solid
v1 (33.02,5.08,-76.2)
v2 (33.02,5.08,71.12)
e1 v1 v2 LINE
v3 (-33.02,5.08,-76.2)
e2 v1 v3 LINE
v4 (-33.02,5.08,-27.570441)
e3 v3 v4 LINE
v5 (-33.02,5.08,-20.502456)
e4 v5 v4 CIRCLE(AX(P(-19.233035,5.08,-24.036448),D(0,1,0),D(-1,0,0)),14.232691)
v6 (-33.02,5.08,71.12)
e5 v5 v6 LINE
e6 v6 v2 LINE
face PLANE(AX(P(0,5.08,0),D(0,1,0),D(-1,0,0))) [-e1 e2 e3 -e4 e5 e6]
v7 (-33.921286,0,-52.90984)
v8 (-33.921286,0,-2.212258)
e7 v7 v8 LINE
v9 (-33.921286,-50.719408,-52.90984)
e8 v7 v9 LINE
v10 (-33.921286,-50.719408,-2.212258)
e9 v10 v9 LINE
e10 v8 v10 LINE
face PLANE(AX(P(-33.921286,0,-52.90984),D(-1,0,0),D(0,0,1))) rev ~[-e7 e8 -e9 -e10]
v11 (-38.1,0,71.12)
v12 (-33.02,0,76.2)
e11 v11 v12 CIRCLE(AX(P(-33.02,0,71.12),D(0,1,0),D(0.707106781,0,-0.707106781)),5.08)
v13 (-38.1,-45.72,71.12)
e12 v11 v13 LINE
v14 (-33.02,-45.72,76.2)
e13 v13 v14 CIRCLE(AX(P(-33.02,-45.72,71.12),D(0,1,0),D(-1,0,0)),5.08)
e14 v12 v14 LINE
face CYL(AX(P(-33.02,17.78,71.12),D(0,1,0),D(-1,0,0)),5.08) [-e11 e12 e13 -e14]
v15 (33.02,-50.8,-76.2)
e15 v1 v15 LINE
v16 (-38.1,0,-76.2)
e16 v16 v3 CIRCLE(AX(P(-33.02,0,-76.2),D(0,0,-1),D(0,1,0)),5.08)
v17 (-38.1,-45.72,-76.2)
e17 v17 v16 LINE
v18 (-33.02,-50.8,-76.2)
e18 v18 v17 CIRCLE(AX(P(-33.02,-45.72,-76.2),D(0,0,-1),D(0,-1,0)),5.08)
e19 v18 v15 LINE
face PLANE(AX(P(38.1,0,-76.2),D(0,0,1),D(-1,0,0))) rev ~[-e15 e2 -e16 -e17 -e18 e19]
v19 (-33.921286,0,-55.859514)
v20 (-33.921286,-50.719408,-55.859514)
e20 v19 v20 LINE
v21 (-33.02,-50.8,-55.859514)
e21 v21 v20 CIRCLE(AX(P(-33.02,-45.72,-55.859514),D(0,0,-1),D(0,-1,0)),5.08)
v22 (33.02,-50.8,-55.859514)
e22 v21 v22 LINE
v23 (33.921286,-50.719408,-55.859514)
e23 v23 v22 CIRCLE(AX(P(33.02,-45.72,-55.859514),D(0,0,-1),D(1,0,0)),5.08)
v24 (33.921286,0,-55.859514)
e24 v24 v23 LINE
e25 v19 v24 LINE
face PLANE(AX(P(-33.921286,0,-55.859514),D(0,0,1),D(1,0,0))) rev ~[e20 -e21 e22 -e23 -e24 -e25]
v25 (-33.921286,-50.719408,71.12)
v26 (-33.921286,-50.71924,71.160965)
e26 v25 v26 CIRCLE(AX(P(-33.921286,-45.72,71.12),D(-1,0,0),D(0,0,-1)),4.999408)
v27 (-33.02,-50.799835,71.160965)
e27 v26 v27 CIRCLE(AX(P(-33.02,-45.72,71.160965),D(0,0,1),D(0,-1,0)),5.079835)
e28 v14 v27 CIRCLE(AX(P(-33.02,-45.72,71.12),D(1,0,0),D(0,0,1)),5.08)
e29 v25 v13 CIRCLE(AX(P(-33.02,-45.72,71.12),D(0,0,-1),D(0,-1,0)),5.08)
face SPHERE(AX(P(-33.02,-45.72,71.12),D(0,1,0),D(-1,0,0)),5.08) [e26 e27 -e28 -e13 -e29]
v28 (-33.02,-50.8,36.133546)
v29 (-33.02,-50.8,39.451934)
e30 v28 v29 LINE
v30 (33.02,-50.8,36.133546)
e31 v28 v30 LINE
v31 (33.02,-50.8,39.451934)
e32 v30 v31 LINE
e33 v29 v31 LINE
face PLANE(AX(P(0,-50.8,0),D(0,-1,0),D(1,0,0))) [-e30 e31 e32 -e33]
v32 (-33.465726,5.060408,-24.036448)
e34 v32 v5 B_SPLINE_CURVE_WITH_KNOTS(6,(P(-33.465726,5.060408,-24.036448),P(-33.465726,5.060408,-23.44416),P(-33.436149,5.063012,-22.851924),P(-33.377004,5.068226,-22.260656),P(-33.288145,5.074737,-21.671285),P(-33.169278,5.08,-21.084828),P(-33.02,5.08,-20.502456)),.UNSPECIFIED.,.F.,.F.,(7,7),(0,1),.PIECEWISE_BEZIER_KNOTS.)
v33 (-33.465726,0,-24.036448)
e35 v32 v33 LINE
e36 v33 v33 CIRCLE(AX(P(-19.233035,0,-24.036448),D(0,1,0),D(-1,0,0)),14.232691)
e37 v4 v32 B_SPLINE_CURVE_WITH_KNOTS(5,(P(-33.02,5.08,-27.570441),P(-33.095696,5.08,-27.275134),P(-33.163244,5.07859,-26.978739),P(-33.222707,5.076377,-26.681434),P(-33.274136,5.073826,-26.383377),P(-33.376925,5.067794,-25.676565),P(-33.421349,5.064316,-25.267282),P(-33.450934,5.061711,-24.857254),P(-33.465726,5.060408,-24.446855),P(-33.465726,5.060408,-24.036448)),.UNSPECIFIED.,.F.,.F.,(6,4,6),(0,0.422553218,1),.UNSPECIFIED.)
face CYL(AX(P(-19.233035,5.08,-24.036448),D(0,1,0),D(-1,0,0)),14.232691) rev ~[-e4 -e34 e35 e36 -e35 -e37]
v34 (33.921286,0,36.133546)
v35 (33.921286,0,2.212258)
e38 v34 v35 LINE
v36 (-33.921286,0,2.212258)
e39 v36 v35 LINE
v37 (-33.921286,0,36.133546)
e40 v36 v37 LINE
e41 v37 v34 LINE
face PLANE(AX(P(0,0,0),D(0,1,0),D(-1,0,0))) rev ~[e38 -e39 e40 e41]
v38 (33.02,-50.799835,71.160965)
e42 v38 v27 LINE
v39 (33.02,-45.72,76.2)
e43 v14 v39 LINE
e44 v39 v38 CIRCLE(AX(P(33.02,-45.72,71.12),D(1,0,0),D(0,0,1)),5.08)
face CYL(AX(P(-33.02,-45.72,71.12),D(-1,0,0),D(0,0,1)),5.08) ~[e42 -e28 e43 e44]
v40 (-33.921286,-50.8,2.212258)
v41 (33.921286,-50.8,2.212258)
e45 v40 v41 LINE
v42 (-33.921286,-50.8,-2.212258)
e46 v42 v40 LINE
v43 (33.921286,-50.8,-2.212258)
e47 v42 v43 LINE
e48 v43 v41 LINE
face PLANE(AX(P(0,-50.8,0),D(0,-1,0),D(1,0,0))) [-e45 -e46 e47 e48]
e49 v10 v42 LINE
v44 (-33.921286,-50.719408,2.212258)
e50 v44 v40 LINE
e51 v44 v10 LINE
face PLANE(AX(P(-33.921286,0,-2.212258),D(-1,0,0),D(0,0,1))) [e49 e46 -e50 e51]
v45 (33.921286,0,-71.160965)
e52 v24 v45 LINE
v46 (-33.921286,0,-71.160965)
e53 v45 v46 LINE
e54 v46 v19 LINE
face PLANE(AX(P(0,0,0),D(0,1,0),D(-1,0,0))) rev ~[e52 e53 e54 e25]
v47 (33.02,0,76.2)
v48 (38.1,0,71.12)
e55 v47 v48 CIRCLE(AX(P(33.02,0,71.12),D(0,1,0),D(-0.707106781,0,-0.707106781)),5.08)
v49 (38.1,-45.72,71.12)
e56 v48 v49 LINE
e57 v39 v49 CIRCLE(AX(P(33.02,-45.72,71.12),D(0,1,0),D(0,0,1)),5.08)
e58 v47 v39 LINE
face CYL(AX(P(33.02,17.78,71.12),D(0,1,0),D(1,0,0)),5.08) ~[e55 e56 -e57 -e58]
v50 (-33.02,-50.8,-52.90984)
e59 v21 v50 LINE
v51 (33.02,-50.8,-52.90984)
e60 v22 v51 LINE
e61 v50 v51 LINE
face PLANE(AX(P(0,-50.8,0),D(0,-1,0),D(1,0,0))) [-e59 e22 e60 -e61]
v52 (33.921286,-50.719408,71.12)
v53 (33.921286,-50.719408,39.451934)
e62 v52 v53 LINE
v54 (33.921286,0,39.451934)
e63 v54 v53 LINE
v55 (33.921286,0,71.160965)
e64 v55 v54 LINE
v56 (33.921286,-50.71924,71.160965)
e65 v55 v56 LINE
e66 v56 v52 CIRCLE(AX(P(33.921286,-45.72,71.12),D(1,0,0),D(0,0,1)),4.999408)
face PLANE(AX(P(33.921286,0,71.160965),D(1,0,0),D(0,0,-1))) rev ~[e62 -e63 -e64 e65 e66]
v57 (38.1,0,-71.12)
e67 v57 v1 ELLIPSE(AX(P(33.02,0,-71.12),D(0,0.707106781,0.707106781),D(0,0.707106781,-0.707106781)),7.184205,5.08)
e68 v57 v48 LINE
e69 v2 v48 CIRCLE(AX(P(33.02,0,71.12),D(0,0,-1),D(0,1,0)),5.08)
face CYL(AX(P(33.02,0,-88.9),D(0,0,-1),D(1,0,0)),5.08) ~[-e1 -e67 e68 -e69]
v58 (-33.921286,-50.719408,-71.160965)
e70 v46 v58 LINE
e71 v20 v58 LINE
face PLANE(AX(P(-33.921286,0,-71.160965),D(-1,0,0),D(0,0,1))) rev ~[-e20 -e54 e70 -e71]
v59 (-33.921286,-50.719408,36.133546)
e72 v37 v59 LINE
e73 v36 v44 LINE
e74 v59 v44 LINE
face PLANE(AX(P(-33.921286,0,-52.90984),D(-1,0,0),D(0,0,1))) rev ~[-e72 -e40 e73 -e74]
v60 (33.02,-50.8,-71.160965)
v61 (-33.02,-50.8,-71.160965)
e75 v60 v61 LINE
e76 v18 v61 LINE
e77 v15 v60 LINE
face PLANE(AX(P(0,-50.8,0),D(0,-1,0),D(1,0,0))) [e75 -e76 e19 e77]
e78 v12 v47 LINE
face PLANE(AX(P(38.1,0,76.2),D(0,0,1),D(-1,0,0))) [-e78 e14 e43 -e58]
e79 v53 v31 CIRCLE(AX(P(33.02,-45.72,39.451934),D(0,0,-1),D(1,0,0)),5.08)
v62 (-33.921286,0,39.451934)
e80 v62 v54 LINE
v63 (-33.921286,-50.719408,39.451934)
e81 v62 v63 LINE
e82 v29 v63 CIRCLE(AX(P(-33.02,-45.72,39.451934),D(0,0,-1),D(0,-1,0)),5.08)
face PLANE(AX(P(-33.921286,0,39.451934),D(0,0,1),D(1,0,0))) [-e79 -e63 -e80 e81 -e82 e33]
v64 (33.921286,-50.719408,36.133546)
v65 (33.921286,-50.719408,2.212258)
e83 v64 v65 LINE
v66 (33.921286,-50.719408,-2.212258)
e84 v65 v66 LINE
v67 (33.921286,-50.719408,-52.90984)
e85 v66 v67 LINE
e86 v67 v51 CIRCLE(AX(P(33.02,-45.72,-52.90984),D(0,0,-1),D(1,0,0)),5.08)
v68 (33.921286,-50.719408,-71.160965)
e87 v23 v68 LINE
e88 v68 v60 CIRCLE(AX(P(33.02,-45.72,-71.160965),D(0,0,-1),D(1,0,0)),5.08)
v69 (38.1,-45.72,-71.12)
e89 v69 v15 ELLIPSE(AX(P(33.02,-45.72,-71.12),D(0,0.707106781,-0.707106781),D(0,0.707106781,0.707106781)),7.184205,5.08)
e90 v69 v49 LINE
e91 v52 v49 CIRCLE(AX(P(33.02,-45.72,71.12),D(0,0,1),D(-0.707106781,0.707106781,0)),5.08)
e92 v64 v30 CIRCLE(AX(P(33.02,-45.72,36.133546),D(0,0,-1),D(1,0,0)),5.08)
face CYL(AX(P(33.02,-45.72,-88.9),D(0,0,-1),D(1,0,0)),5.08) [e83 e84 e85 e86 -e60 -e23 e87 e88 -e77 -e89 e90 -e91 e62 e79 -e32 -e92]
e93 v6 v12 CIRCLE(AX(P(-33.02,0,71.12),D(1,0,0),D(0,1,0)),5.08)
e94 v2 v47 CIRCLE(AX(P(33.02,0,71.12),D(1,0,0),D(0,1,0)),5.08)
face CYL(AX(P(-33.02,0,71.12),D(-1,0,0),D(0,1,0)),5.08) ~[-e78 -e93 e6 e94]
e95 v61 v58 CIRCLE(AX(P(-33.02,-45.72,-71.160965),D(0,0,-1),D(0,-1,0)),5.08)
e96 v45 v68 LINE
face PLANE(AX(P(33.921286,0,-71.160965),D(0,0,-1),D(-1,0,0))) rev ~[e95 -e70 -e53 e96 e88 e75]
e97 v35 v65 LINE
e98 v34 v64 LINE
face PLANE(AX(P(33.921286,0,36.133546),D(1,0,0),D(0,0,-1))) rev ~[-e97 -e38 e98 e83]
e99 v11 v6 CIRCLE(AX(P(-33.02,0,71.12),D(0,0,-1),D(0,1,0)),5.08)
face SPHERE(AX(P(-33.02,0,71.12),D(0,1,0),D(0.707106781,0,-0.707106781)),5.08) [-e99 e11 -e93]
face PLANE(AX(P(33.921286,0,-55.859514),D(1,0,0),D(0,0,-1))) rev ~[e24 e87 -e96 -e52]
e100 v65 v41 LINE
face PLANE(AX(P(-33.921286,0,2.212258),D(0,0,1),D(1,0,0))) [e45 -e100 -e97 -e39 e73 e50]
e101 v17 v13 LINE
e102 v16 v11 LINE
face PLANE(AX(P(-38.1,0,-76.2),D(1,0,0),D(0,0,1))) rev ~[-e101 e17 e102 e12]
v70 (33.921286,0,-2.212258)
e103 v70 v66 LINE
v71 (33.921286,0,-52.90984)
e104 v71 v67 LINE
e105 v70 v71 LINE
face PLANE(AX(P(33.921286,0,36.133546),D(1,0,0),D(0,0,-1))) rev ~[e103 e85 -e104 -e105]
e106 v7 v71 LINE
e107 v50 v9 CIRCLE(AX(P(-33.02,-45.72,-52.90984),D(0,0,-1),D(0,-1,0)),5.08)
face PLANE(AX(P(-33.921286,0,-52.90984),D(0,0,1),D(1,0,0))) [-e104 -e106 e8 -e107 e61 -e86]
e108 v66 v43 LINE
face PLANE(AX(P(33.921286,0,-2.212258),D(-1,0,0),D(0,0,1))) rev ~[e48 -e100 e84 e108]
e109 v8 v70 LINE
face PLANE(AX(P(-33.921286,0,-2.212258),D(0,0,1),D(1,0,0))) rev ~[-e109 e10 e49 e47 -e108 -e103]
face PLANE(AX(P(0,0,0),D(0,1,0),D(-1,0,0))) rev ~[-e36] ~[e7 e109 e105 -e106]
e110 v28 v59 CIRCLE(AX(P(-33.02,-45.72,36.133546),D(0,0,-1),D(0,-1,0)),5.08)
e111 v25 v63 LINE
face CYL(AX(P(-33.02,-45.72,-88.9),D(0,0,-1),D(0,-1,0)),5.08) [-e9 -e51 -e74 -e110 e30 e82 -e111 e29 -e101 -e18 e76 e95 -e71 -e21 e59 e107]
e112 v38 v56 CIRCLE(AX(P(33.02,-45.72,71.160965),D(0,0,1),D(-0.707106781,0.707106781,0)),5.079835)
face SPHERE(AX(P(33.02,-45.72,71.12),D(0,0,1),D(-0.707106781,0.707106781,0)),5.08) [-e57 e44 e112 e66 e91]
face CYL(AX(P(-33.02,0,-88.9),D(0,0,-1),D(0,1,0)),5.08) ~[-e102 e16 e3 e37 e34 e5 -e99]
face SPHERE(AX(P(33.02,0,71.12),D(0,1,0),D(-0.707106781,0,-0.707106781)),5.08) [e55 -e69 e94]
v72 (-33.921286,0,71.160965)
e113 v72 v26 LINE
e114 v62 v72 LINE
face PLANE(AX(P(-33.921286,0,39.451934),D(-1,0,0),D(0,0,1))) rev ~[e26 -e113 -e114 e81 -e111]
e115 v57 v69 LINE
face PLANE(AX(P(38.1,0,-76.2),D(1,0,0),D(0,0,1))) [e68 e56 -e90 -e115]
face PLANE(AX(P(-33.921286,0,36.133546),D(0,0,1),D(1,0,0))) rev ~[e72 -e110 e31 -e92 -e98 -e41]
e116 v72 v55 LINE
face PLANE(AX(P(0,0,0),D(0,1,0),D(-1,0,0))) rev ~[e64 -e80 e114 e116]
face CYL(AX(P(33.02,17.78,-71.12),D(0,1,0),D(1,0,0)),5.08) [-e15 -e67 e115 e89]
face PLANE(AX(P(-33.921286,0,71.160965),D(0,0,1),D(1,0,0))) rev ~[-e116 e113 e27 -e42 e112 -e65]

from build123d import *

# Parameters (mm, degrees)
F0_W         = 76.2
F0_H         = 152.4
F0_W_2       = 67.8425729275
F0_H_2       = 3.318388015
F0_H_3       = 2.9496736825
F1_DEPTH     = 50.8
F2_W         = 76.2
F2_H         = 152.4
F2_W_2       = 67.8425729275
F2_H_2       = 15.301451087
F2_H_3       = 89.0433862805
F2_H_4       = 31.7090302706
F3_DEPTH     = 5.08
F4_T1_DEPTH  = 81.28
F4_T3_DEPTH  = 177.8
F5_T1_DEPTH  = 66.04
F5_S5_W      = 5.08
F5_S5_H      = 5.08
F5_T6_DEPTH  = 5.08
F5_S11_W     = 5.08
F5_S11_H     = 5.08
F5_T12_DEPTH = 5.08
F6_T1_DEPTH  = 160.02
F6_T3_DEPTH  = 66.04
F6_S7_W      = 5.08
F6_S7_H      = 5.08
F6_T8_DEPTH  = 5.08
F6_T12_ANGLE = 89.9999999979
F7_W         = 67.8425729275
F7_H         = 4.4245161116
F8_DEPTH     = 50.8
F9_R         = 14.2326914524
F10_DEPTH    = 25.4


# Not quite as in the source:
# - a fillet or chamfer that OpenCascade refuses, or shapes differently, is made with other operations: its cross-section is extruded or revolved along the edge and cut away or added


with BuildPart() as f1:
    # F0 (on Front) → F1 (new body)
    with BuildSketch(Plane.XZ):
        Rectangle(F0_W, F0_H)
        Polygon((-33.9212864637, 71.1609646678), (33.9212864637, 71.1609646678), (33.9212864637, 39.4519343972), (33.9212864637, 36.1335463822), (33.9212864637, -52.9098398983), (33.9212864637, -55.8595135808), (33.9212864637, -71.1609646678), (-33.9212864637, -71.1609646678), (-33.9212864637, -55.8595135808), (-33.9212864637, -52.9098398983), (-33.9212864637, 36.1335463822), (-33.9212864637, 39.4519343972), align=None, mode=Mode.SUBTRACT)
        with Locations((0, 37.7927403897)):
            Rectangle(F0_W_2, F0_H_2)
        with Locations((0, -54.3846767396)):
            Rectangle(F0_W_2, F0_H_3)
    extrude(amount=F1_DEPTH)

    # F2 (on face) → F3 (join)
    with BuildSketch(Plane(origin=(0, 0, 0), x_dir=(-1, 0, 0), z_dir=(0, 1, 0))):
        Rectangle(F2_W, F2_H)
        with Locations((0, -63.5102391243)):
            Rectangle(F2_W_2, F2_H_2, mode=Mode.SUBTRACT)
        with Locations((0, -8.3881467581)):
            Rectangle(F2_W_2, F2_H_3, mode=Mode.SUBTRACT)
        with Locations((0, 55.3064495325)):
            Rectangle(F2_W_2, F2_H_4, mode=Mode.SUBTRACT)
        with Locations((0, 55.3064495325)):
            Rectangle(F2_W_2, F2_H_4)
        with Locations((0, -63.5102391243)):
            Rectangle(F2_W_2, F2_H_2)
        with Locations((0, -8.3881467581)):
            Rectangle(F2_W_2, F2_H_3)
    extrude(amount=F3_DEPTH)

    # F4: fillet of radius 5.08 on 6 edges, made by hand

    # F4_s2 → F4_t1 (cut)
    with BuildSketch(Plane.XZ.offset(-17.78)):
        with BuildLine():
            ThreePointArc((38.1, -71.12), (36.6121024484, -74.7121024484), (33.02, -76.2))
            Line((33.02, -76.2), (38.1, -76.2))
            Line((38.1, -76.2), (38.1, -71.12))
        make_face()
        with BuildLine():
            ThreePointArc((38.1, 71.12), (36.6121024484, 74.7121024484), (33.02, 76.2))
            Line((33.02, 76.2), (38.1, 76.2))
            Line((38.1, 76.2), (38.1, 71.12))
        make_face()
        with BuildLine():
            ThreePointArc((-38.1, 71.12), (-36.6121024484, 74.7121024484), (-33.02, 76.2))
            Line((-33.02, 76.2), (-38.1, 76.2))
            Line((-38.1, 76.2), (-38.1, 71.12))
        make_face()
    extrude(amount=F4_T1_DEPTH, mode=Mode.SUBTRACT)

    # F4_s4 → F4_t3 (cut)
    with BuildSketch(Plane.XY.offset(-88.9)):
        with BuildLine():
            ThreePointArc((38.1, -45.72), (36.6121024484, -49.3121024484), (33.02, -50.8))
            Line((33.02, -50.8), (38.1, -50.8))
            Line((38.1, -50.8), (38.1, -45.72))
        make_face()
        with BuildLine():
            ThreePointArc((38.1, 0), (36.6121024484, 3.5921024484), (33.02, 5.08))
            Line((33.02, 5.08), (38.1, 5.08))
            Line((38.1, 5.08), (38.1, 0))
        make_face()
        with BuildLine():
            ThreePointArc((-33.02, 5.08), (-36.6121024484, 3.5921024484), (-38.1, 0))
            Line((-38.1, 0), (-38.1, 5.08))
            Line((-38.1, 5.08), (-33.02, 5.08))
        make_face()
    extrude(amount=F4_T3_DEPTH, mode=Mode.SUBTRACT)

    # F5: fillet of radius 5.08 on 1 edges, made by hand

    # F5_s2 → F5_t1 (cut)
    with BuildSketch(Plane.YZ.offset(-33.02)):
        with BuildLine():
            ThreePointArc((5.08, 71.12), (3.5921024484, 74.7121024484), (0, 76.2))
            Line((0, 76.2), (5.08, 76.2))
            Line((5.08, 76.2), (5.08, 71.12))
        make_face()
    extrude(amount=F5_T1_DEPTH, mode=Mode.SUBTRACT)


with BuildPart() as f5_tool4:
    # F5_s5 → F5_t6 (new body)
    with BuildSketch(Plane.XZ):
        with Locations((-35.56, 73.66)):
            Rectangle(F5_S5_W, F5_S5_H)
    extrude(amount=-F5_T6_DEPTH)

    # F5_s7 → F5_t8 (revolve, cut)
    with BuildSketch(Plane(origin=(-33.02, 0, 71.12), x_dir=(0.7071067812, 0, -0.7071067812), z_dir=(0.7071067812, 0, 0.7071067812))):
        with BuildLine():
            ThreePointArc((0, -5.08), (5.08, 0), (0, 5.08))
            Line((0, 5.08), (0, -5.08))
        make_face()
    revolve(axis=Axis((-33.02, 0, 71.12), (0, 1, 0)), mode=Mode.SUBTRACT)


with BuildPart() as f1_1:
    add(f1.part)

    # F5_t3: cut F5_tool4
    add(f5_tool4.part, mode=Mode.SUBTRACT)


with BuildPart() as f5_tool10:
    # F5_s11 → F5_t12 (new body)
    with BuildSketch(Plane.XZ):
        with Locations((35.56, 73.66)):
            Rectangle(F5_S11_W, F5_S11_H)
    extrude(amount=-F5_T12_DEPTH)

    # F5_s13 → F5_t14 (revolve, cut)
    with BuildSketch(Plane(origin=(33.02, 0, 71.12), x_dir=(-0.7071067812, 0, -0.7071067812), z_dir=(0.7071067812, 0, -0.7071067812))):
        with BuildLine():
            ThreePointArc((0, -5.08), (5.08, 0), (0, 5.08))
            Line((0, 5.08), (0, -5.08))
        make_face()
    revolve(axis=Axis((33.02, 0, 71.12), (0, 1, 0)), mode=Mode.SUBTRACT)


with BuildPart() as f1_2:
    add(f1_1.part)

    # F5_t9: cut F5_tool10
    add(f5_tool10.part, mode=Mode.SUBTRACT)

    # F6: fillet of radius 5.08 on 1 edges, made by hand

    # F6_s2 → F6_t1 (cut)
    with BuildSketch(Plane.XY.offset(-88.9)):
        with BuildLine():
            ThreePointArc((-33.02, -50.8), (-36.6121024484, -49.3121024484), (-38.1, -45.72))
            Line((-38.1, -45.72), (-38.1, -50.8))
            Line((-38.1, -50.8), (-33.02, -50.8))
        make_face()
    extrude(amount=F6_T1_DEPTH, mode=Mode.SUBTRACT)

    # F6_s4 → F6_t3 (cut)
    with BuildSketch(Plane.YZ.offset(-33.02)):
        with BuildLine():
            ThreePointArc((-45.72, 76.2), (-49.3121024484, 74.7121024484), (-50.8, 71.12))
            Line((-50.8, 71.12), (-50.8, 76.2))
            Line((-50.8, 76.2), (-45.72, 76.2))
        make_face()
    extrude(amount=F6_T3_DEPTH, mode=Mode.SUBTRACT)


with BuildPart() as f6_tool6:
    # F6_s7 → F6_t8 (new body)
    with BuildSketch(Plane.XY.offset(71.12)):
        with Locations((35.56, -48.26)):
            Rectangle(F6_S7_W, F6_S7_H)
    extrude(amount=F6_T8_DEPTH)

    # F6_s9 → F6_t10 (revolve, cut)
    with BuildSketch(Plane(origin=(33.02, -45.72, 71.12), x_dir=(-0.7071067812, 0.7071067812, 0), z_dir=(0.7071067812, 0.7071067812, 0))):
        with BuildLine():
            ThreePointArc((0, -5.08), (5.08, 0), (0, 5.08))
            Line((0, 5.08), (0, -5.08))
        make_face()
    revolve(axis=Axis((33.02, -45.72, 71.12), (0, 0, 1)), mode=Mode.SUBTRACT)


with BuildPart() as f1_3:
    add(f1_2.part)

    # F6_t5: cut F6_tool6
    add(f6_tool6.part, mode=Mode.SUBTRACT)

    # F6_s11 → F6_t12 (revolve, cut)
    with BuildSketch(Plane.XY.offset(71.1199999999)):
        with BuildLine():
            ThreePointArc((-33.02, -50.8), (-36.6121024484, -49.3121024484), (-38.1, -45.72))
            Line((-38.1, -45.72), (-38.1, -50.8))
            Line((-38.1, -50.8), (-33.02, -50.8))
        make_face()
    revolve(axis=Axis((-33.0199999999, -50.8, 71.1199999999), (0, 1, 0)), revolution_arc=F6_T12_ANGLE, mode=Mode.SUBTRACT)

    # F7 (on face) → F8 (join)
    with BuildSketch(Plane.XZ):
        Rectangle(F7_W, F7_H)
    extrude(amount=F8_DEPTH)

    # F9 (on face) → F10 (cut)
    with BuildSketch(Plane(origin=(0, 5.08, 0), x_dir=(-1, 0, 0), z_dir=(0, 1, 0))):
        with Locations((19.2330349237, -24.0364484489)):
            Circle(F9_R)
    extrude(amount=-F10_DEPTH, mode=Mode.SUBTRACT)


solid = f1_3.part
